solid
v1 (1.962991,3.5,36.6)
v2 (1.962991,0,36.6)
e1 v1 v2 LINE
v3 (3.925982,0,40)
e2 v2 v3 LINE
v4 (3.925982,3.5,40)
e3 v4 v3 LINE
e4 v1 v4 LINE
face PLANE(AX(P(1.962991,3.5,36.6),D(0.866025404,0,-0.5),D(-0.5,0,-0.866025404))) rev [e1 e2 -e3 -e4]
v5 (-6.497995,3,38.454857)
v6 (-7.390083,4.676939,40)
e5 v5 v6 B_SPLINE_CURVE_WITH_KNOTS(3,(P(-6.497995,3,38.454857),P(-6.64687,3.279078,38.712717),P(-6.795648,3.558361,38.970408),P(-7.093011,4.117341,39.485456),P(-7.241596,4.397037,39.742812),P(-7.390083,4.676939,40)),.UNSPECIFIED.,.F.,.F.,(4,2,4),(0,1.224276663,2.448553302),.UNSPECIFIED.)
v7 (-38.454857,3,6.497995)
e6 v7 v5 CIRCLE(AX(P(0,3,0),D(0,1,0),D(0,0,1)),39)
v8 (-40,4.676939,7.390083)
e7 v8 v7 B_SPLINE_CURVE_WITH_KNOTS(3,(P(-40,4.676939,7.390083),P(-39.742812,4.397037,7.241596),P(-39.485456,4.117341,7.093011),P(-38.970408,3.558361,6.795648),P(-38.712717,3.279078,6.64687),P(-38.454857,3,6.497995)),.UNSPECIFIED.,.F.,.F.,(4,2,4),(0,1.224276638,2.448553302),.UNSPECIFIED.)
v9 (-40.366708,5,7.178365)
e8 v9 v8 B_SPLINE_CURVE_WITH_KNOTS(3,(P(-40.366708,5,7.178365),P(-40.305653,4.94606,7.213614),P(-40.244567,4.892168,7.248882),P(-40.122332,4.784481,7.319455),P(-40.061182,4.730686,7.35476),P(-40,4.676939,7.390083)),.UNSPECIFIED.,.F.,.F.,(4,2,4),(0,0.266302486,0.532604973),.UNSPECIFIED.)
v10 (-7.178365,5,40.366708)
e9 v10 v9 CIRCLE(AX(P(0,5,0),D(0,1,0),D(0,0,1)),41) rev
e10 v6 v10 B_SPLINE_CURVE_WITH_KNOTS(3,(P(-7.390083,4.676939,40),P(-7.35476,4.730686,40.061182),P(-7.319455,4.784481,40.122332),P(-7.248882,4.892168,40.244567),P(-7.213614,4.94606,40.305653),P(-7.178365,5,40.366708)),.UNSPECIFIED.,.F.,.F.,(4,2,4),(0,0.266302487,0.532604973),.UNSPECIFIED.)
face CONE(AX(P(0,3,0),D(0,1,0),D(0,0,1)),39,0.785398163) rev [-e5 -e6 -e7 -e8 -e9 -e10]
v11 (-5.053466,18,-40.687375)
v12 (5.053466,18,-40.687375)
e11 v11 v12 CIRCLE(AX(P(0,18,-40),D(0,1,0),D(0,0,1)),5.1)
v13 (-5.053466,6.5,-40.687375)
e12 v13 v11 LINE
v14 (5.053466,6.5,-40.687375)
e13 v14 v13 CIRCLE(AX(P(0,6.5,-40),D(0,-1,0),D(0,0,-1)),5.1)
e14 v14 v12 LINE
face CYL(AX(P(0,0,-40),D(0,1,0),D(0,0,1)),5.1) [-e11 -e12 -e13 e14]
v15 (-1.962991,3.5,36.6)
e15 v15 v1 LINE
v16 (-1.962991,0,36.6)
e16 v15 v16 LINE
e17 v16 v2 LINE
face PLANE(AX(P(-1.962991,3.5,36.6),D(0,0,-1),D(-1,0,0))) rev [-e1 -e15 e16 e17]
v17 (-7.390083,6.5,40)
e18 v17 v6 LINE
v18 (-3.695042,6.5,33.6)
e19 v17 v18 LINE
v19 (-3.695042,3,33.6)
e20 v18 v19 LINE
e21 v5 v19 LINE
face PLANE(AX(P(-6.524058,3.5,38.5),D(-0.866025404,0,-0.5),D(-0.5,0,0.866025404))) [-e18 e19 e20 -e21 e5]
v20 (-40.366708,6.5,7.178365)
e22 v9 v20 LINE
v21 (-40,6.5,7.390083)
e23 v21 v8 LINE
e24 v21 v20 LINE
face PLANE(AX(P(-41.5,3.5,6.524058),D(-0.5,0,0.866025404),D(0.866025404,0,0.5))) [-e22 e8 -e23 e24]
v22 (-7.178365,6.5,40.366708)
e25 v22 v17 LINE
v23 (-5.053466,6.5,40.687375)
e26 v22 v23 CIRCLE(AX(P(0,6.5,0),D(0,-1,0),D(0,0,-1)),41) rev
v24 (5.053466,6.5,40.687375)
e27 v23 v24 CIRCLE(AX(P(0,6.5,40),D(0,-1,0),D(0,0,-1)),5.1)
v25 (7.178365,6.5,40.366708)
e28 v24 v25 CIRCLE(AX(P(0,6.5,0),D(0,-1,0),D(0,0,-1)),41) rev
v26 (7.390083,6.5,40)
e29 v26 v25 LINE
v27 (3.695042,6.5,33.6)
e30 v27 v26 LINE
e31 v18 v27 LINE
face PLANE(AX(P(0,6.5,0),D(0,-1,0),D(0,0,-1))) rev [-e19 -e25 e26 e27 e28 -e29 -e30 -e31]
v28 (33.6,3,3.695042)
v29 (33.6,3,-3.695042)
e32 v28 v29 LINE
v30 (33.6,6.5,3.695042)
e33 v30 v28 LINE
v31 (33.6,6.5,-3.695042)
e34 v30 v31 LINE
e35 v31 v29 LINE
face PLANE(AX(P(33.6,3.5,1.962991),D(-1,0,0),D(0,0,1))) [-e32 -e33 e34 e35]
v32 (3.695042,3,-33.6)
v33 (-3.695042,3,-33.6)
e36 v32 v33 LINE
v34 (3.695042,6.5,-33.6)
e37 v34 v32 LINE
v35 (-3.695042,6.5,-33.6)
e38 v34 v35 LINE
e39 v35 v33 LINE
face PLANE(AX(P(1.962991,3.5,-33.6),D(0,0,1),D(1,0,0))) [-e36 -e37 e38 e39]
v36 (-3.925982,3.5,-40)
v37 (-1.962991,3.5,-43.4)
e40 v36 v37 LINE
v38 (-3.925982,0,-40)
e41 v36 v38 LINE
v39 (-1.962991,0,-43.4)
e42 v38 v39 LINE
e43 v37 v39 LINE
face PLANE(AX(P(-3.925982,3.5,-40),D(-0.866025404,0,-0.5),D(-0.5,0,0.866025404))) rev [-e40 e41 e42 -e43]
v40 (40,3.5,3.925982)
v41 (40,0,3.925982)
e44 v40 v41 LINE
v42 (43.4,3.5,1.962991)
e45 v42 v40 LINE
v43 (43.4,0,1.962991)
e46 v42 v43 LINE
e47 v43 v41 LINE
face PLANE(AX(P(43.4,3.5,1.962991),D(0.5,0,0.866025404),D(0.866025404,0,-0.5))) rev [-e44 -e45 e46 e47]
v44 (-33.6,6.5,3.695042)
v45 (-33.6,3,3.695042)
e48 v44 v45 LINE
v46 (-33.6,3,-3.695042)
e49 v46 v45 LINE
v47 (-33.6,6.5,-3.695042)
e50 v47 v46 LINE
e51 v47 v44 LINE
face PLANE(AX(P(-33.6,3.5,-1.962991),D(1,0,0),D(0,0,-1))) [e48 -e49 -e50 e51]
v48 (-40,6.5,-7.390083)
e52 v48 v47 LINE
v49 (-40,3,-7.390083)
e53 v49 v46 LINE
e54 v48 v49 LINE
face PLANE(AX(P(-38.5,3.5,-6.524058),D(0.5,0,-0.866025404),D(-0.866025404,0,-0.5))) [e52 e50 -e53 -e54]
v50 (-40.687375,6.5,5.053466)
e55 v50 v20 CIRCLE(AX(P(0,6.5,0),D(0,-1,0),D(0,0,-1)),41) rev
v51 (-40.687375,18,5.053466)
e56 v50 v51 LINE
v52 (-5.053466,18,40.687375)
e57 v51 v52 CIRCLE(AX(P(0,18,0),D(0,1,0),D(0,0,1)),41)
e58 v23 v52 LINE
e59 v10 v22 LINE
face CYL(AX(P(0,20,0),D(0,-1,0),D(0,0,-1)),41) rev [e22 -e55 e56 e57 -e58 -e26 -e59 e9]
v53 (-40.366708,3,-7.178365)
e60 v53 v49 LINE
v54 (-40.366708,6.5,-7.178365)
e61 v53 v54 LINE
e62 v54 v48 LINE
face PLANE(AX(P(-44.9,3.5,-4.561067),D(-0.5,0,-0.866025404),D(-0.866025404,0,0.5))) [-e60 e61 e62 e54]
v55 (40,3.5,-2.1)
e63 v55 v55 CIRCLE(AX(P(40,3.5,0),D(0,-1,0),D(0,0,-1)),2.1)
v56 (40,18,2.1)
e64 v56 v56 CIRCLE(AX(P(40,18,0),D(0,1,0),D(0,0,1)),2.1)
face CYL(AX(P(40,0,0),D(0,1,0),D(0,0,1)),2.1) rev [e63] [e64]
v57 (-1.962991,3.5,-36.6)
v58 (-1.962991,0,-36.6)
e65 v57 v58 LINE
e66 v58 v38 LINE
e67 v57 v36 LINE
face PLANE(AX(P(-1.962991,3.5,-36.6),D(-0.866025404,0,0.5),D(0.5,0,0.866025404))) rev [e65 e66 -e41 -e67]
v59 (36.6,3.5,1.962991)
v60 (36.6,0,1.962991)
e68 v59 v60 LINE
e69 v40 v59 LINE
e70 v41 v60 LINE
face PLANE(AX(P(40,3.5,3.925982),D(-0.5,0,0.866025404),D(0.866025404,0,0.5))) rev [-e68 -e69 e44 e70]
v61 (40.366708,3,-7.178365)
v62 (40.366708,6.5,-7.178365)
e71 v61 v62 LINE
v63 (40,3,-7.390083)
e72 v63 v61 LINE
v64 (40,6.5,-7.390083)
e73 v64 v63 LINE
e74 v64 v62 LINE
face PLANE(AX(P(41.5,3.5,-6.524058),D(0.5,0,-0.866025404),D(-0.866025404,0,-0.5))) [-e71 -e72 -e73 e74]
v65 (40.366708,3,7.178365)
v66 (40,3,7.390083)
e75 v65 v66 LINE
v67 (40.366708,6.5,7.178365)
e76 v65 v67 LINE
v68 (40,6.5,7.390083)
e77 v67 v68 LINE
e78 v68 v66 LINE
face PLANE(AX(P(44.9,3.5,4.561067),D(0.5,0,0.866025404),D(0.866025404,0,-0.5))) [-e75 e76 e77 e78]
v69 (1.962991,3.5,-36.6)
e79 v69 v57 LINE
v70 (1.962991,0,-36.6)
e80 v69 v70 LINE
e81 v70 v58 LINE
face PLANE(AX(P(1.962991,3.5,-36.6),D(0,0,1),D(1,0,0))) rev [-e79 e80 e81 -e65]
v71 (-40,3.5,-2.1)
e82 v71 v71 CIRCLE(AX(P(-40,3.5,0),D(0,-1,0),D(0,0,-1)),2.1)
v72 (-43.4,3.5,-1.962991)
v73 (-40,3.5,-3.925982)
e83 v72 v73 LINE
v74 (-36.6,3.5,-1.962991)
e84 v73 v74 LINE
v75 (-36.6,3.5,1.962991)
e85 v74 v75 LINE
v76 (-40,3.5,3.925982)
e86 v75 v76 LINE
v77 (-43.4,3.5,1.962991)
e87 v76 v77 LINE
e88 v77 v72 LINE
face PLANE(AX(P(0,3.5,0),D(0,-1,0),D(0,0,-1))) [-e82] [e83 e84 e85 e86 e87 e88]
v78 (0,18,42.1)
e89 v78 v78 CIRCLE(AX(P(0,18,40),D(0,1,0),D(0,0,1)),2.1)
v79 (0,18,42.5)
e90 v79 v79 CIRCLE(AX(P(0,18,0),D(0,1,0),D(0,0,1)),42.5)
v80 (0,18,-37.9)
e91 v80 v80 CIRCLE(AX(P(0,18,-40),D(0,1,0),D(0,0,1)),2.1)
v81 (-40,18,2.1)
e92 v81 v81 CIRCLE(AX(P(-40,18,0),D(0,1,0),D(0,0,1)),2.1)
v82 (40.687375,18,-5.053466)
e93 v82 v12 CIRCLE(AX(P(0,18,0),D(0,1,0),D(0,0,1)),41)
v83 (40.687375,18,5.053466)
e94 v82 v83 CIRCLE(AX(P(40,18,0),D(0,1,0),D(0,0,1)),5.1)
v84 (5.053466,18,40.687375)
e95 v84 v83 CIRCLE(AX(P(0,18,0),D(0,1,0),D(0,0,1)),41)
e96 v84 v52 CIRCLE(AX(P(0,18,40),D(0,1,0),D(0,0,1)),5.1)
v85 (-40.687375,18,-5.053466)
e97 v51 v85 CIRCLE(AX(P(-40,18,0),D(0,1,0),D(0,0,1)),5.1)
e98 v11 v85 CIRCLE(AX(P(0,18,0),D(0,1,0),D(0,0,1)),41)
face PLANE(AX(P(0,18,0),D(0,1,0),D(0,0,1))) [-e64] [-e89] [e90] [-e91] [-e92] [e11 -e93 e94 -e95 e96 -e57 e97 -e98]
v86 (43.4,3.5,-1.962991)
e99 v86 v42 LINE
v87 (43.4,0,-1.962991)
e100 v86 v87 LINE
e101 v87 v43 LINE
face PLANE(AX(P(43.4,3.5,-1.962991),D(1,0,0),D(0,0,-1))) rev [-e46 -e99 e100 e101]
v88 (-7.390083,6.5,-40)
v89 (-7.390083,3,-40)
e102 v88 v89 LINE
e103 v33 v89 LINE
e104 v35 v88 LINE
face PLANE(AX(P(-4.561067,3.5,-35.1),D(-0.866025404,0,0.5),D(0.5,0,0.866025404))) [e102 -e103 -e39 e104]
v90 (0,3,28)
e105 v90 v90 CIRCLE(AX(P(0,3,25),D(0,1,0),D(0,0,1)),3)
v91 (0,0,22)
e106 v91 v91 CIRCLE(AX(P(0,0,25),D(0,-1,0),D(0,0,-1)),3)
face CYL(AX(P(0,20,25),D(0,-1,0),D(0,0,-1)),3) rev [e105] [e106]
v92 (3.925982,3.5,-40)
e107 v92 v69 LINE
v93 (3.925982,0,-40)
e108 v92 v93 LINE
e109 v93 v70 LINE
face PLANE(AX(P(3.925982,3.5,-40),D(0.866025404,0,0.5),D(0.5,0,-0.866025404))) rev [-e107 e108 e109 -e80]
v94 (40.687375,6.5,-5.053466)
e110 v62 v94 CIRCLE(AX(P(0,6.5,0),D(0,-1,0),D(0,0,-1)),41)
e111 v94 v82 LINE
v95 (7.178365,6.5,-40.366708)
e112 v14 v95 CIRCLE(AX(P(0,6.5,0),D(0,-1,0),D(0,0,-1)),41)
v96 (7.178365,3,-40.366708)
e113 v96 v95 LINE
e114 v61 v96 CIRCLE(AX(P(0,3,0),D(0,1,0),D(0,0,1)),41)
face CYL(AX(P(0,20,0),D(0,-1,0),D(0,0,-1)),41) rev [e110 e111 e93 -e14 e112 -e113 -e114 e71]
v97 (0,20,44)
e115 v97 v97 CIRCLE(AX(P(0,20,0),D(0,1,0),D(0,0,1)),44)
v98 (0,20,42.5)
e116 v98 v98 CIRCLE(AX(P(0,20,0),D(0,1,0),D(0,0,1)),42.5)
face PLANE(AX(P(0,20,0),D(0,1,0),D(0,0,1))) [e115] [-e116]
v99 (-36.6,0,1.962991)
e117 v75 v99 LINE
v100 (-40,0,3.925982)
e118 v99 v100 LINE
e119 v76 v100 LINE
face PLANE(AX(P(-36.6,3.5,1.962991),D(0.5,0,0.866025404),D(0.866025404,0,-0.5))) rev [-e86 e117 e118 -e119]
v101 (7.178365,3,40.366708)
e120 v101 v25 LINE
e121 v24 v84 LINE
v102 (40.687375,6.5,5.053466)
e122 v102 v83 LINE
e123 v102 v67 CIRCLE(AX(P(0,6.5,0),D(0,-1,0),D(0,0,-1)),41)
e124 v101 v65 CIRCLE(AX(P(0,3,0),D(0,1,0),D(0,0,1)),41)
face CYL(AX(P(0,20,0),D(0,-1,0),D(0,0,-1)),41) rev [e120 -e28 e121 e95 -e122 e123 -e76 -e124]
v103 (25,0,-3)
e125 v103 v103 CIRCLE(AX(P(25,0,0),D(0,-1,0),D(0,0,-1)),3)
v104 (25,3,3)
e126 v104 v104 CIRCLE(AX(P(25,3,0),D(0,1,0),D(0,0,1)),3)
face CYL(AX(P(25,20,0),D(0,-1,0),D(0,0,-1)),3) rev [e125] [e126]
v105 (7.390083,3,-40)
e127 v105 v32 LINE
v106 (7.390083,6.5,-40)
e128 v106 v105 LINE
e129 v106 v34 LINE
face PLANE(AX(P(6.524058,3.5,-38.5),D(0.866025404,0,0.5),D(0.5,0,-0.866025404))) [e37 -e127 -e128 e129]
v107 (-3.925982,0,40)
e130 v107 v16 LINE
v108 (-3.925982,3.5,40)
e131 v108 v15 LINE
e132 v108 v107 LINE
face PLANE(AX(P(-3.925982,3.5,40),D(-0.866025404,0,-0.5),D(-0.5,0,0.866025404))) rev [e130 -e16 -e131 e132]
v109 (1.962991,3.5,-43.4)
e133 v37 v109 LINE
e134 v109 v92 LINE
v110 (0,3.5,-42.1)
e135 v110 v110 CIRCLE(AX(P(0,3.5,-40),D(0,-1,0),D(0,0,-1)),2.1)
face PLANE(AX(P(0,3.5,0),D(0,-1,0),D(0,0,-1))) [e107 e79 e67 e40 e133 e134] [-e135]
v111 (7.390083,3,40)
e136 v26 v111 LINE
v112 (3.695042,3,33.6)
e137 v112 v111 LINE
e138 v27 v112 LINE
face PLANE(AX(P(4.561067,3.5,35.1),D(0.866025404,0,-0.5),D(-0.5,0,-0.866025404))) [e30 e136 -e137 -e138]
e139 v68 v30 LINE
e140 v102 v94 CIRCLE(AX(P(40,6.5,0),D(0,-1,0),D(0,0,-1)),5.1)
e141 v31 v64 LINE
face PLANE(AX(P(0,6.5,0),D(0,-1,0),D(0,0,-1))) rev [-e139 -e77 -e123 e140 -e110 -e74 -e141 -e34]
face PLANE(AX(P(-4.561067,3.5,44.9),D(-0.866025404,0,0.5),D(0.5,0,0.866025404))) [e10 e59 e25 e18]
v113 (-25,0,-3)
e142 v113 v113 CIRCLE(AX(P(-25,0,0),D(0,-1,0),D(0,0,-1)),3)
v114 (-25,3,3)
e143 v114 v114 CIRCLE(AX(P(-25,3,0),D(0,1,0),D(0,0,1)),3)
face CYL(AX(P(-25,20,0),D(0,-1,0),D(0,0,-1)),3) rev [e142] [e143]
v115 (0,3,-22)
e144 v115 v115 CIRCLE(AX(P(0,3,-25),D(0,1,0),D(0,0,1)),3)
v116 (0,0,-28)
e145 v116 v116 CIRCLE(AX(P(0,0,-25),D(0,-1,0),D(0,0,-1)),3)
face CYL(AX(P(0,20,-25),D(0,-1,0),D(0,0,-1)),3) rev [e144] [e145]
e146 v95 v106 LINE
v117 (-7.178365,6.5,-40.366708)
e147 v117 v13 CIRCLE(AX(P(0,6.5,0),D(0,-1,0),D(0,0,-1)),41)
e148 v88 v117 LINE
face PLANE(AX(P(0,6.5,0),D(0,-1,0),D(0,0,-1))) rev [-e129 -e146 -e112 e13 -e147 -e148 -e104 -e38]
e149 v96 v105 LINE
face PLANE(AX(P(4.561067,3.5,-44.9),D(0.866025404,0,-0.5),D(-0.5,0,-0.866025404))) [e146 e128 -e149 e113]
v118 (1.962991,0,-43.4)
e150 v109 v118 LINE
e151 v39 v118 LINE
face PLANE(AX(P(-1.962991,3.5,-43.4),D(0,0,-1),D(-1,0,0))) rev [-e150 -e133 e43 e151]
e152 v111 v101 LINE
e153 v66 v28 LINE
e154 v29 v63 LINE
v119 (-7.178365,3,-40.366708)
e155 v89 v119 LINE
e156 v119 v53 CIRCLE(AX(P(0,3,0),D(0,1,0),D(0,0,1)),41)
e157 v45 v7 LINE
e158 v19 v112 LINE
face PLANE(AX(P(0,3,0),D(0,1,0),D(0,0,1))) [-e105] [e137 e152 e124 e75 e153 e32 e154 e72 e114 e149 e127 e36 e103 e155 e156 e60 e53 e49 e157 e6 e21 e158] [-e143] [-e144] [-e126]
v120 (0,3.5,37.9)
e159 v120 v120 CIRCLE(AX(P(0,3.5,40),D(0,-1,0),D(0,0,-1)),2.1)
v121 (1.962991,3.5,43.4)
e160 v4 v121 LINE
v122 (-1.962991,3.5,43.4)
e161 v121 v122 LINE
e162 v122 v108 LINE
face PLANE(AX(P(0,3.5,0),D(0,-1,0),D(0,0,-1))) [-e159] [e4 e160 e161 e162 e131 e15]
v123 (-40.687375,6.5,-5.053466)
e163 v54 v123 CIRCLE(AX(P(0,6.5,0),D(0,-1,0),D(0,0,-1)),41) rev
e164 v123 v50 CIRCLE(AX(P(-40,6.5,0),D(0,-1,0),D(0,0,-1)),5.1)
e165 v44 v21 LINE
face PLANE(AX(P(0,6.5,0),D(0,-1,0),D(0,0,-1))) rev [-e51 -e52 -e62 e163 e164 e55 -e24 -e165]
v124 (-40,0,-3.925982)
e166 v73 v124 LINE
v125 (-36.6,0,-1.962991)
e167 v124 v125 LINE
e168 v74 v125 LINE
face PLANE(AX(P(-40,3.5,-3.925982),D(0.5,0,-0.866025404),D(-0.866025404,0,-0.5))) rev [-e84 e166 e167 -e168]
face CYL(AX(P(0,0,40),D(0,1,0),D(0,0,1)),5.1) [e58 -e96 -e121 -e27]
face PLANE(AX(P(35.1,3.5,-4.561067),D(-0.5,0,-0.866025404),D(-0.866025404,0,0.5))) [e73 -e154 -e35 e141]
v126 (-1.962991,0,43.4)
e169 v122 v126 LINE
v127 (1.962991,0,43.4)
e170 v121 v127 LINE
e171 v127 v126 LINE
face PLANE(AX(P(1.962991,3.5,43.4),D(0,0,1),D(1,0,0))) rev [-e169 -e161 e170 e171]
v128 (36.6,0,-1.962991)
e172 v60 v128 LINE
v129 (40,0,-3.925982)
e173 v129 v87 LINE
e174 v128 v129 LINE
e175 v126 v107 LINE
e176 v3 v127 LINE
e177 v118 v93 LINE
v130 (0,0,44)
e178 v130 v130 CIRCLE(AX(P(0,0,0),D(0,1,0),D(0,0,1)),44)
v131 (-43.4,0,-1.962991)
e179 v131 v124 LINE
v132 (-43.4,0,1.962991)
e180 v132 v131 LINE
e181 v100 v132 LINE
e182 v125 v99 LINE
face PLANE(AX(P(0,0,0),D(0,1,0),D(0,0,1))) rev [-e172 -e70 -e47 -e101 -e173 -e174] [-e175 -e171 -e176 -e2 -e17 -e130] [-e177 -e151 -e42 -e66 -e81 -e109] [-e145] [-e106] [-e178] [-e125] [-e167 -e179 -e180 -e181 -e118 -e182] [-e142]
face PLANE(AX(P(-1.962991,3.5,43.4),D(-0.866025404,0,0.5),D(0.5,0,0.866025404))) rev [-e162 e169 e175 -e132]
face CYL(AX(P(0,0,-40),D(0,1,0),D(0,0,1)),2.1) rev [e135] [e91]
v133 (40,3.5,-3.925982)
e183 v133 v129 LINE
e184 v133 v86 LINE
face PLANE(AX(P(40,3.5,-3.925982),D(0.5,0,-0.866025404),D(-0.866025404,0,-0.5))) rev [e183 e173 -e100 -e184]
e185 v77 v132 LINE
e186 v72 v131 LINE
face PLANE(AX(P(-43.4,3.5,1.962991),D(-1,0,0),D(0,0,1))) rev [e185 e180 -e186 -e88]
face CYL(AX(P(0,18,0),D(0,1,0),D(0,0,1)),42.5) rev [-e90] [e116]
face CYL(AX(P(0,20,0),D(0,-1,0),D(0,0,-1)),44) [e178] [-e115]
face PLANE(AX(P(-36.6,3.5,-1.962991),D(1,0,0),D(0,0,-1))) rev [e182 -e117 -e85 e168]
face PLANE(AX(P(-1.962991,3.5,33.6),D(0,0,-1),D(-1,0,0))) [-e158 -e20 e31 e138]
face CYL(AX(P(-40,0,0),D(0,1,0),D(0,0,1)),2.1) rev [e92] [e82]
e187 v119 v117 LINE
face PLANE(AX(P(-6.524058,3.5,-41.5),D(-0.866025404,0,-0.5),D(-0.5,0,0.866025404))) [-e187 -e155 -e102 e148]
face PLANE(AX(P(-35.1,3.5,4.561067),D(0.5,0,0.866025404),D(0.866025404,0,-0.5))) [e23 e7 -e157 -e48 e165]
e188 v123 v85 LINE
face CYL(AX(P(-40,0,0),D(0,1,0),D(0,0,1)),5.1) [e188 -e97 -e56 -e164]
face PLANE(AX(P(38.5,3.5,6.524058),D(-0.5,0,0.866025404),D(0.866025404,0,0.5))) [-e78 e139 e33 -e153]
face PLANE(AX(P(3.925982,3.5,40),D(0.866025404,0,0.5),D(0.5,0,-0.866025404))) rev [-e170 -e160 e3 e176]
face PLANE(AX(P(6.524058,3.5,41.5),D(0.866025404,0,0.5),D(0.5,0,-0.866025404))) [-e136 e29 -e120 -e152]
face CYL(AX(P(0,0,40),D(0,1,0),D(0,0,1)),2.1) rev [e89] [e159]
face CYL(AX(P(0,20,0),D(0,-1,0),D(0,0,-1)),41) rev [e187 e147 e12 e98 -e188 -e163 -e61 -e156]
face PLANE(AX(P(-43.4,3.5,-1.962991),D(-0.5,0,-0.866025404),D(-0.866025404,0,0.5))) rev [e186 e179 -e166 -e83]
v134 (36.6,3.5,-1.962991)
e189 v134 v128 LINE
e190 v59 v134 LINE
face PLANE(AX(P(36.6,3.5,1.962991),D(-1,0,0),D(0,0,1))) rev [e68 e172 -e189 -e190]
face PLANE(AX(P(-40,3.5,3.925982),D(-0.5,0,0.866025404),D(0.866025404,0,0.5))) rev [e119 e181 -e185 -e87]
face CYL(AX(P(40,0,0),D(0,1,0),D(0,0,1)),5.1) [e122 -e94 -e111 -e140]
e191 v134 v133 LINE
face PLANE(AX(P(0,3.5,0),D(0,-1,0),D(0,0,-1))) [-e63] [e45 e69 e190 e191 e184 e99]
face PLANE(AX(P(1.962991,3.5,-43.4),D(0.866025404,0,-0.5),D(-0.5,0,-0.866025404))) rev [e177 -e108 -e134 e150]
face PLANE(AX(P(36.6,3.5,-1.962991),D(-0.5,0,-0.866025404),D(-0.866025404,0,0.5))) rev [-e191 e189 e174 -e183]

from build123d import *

# Parameters (mm, degrees)
CROQUIS1_R              = 44
SALIENTE_EXTRUIR1_DEPTH = 20
CROQUIS3_R              = 2.1
CORTAR_EXTRUIR3_DEPTH   = 81.199750623
CORTAR_EXTRUIR5_DEPTH   = 3.5
VACIADO1_START          = 3
VACIADO1_DEPTH          = 17
VACIADO1_START_2        = 6.5
VACIADO1_2_DEPTH        = 13.5
CROQUIS2_R              = 3
CORTAR_EXTRUIR1_DEPTH   = 66.360538553
CROQUIS4_R              = 42.5
CORTAR_EXTRUIR4_DEPTH   = 2
CHAFL_N1_SIZE           = 2


# Read off the part's stored shape, not the designer's step: Vaciado1
with BuildPart() as part:
    # Croquis1 → Saliente-Extruir1 (new body)
    with BuildSketch(Plane(origin=(0, 0, 0), x_dir=(1, 0, 0), z_dir=(0, 1, 0))):
        with Locations(Location((0, 0, 0), (0, 0, 270))):
            Circle(CROQUIS1_R)
    extrude(amount=SALIENTE_EXTRUIR1_DEPTH)

    # Croquis3 → Cortar-Extruir3 (cut, through all)
    with BuildSketch(Plane(origin=(0, 20, -20), x_dir=(1, 0, 0), z_dir=(0, -1, 0))):
        with Locations(Location((-40, 20, 0), (0, 0, 270))):
            Circle(CROQUIS3_R)
        with Locations(Location((0, 60, 0), (0, 0, 270))):
            Circle(CROQUIS3_R)
        with Locations(Location((40, 20, 0), (0, 0, 270))):
            Circle(CROQUIS3_R)
        with Locations(Location((0, -20, 0), (0, 0, 270))):
            Circle(CROQUIS3_R)
    extrude(amount=CORTAR_EXTRUIR3_DEPTH, mode=Mode.SUBTRACT)

    # Croquis5 → Cortar-Extruir5 (cut)
    with BuildSketch(Plane.XZ):
        Polygon((40, -3.92598183), (43.4, -1.962990915), (43.4, 1.962990915), (40, 3.92598183), (36.6, 1.962990915), (36.6, -1.962990915), align=None)
        Polygon((3.92598183, 40), (1.962990915, 43.4), (-1.962990915, 43.4), (-3.92598183, 40), (-1.962990915, 36.6), (1.962990915, 36.6), align=None)
        Polygon((-3.92598183, -40), (-1.962990915, -43.4), (1.962990915, -43.4), (3.92598183, -40), (1.962990915, -36.6), (-1.962990915, -36.6), align=None)
        Polygon((-40, 3.92598183), (-43.4, 1.962990915), (-43.4, -1.962990915), (-40, -3.92598183), (-36.6, -1.962990915), (-36.6, 1.962990915), align=None)
    extrude(amount=-CORTAR_EXTRUIR5_DEPTH, mode=Mode.SUBTRACT)

    # Vaciado1 outline → Vaciado1 (cut)
    with BuildSketch(Plane(origin=(0, 0, 0), x_dir=(1, 0, 0), z_dir=(0, 1, 0)).offset(VACIADO1_START)):
        with BuildLine():
            ThreePointArc((-7.178364733, 40.366707567), (-28.991378029, 28.991378029), (-40.366707567, 7.178364733))
            Line((-40.366707567, 7.178364733), (-40, 7.390083446))
            Line((-40, 7.390083446), (-33.6, 3.695041723))
            Line((-33.6, 3.695041723), (-33.6, -3.695041723))
            Line((-33.6, -3.695041723), (-40, -7.390083446))
            Line((-40, -7.390083446), (-40.366707567, -7.178364733))
            ThreePointArc((-40.366707567, -7.178364733), (-28.991378029, -28.991378029), (-7.178364733, -40.366707567))
            Line((-7.178364733, -40.366707567), (-7.390083446, -40))
            Line((-7.390083446, -40), (-3.695041723, -33.6))
            Line((-3.695041723, -33.6), (3.695041723, -33.6))
            Line((3.695041723, -33.6), (7.390083446, -40))
            Line((7.390083446, -40), (7.178364733, -40.366707567))
            ThreePointArc((7.178364733, -40.366707567), (28.991378029, -28.991378029), (40.366707567, -7.178364733))
            Line((40.366707567, -7.178364733), (40, -7.390083446))
            Line((40, -7.390083446), (33.6, -3.695041723))
            Line((33.6, -3.695041723), (33.6, 3.695041723))
            Line((33.6, 3.695041723), (40, 7.390083446))
            Line((40, 7.390083446), (40.366707567, 7.178364733))
            ThreePointArc((40.366707567, 7.178364733), (28.991378029, 28.991378029), (7.178364733, 40.366707567))
            Line((7.178364733, 40.366707567), (7.390083446, 40))
            Line((7.390083446, 40), (3.695041723, 33.6))
            Line((3.695041723, 33.6), (-3.695041723, 33.6))
            Line((-3.695041723, 33.6), (-7.390083446, 40))
            Line((-7.390083446, 40), (-7.178364733, 40.366707567))
        make_face()
    extrude(amount=VACIADO1_DEPTH, mode=Mode.SUBTRACT)

    # Vaciado1 2 outline → Vaciado1 2 (cut)
    with BuildSketch(Plane(origin=(0, 0, 0), x_dir=(1, 0, 0), z_dir=(0, 1, 0)).offset(VACIADO1_START_2)):
        with BuildLine():
            ThreePointArc((-40.366707567, 7.178364733), (-40.540965383, 6.118016497), (-40.687375, 5.053465703))
            ThreePointArc((-40.687375, 5.053465703), (-34.9, 0), (-40.687375, -5.053465703))
            ThreePointArc((-40.687375, -5.053465703), (-40.540965383, -6.118016497), (-40.366707567, -7.178364733))
            Line((-40.366707567, -7.178364733), (-40, -7.390083446))
            Line((-40, -7.390083446), (-33.6, -3.695041723))
            Line((-33.6, -3.695041723), (-33.6, 3.695041723))
            Line((-33.6, 3.695041723), (-40, 7.390083446))
            Line((-40, 7.390083446), (-40.366707567, 7.178364733))
        make_face()
        with BuildLine():
            ThreePointArc((-5.053465703, 40.687375), (-6.118016497, 40.540965383), (-7.178364733, 40.366707567))
            Line((-7.178364733, 40.366707567), (-7.390083446, 40))
            Line((-7.390083446, 40), (-3.695041723, 33.6))
            Line((-3.695041723, 33.6), (3.695041723, 33.6))
            Line((3.695041723, 33.6), (7.390083446, 40))
            Line((7.390083446, 40), (7.178364733, 40.366707567))
            ThreePointArc((7.178364733, 40.366707567), (6.118016497, 40.540965383), (5.053465703, 40.687375))
            ThreePointArc((5.053465703, 40.687375), (0, 34.9), (-5.053465703, 40.687375))
        make_face()
        with BuildLine():
            Line((-7.390083446, -40), (-7.178364733, -40.366707567))
            ThreePointArc((-7.178364733, -40.366707567), (-6.118016497, -40.540965383), (-5.053465703, -40.687375))
            ThreePointArc((-5.053465703, -40.687375), (0, -34.9), (5.053465703, -40.687375))
            ThreePointArc((5.053465703, -40.687375), (6.118016497, -40.540965383), (7.178364733, -40.366707567))
            Line((7.178364733, -40.366707567), (7.390083446, -40))
            Line((7.390083446, -40), (3.695041723, -33.6))
            Line((3.695041723, -33.6), (-3.695041723, -33.6))
            Line((-3.695041723, -33.6), (-7.390083446, -40))
        make_face()
        with BuildLine():
            ThreePointArc((40.687375, 5.053465703), (40.540965383, 6.118016497), (40.366707567, 7.178364733))
            Line((40.366707567, 7.178364733), (40, 7.390083446))
            Line((40, 7.390083446), (33.6, 3.695041723))
            Line((33.6, 3.695041723), (33.6, -3.695041723))
            Line((33.6, -3.695041723), (40, -7.390083446))
            Line((40, -7.390083446), (40.366707567, -7.178364733))
            ThreePointArc((40.366707567, -7.178364733), (40.540965383, -6.118016497), (40.687375, -5.053465703))
            ThreePointArc((40.687375, -5.053465703), (34.9, 0), (40.687375, 5.053465703))
        make_face()
    extrude(amount=VACIADO1_2_DEPTH, mode=Mode.SUBTRACT)

    # Croquis2 → Cortar-Extruir1 (cut, through all)
    with BuildSketch(Plane.XZ):
        with Locations(Location((0, 25, 0), (0, 0, 270))):
            Circle(CROQUIS2_R)
        with Locations(Location((25, 0, 0), (0, 0, 270))):
            Circle(CROQUIS2_R)
        with Locations(Location((0, -25, 0), (0, 0, 270))):
            Circle(CROQUIS2_R)
        with Locations(Location((-25, 0, 0), (0, 0, 270))):
            Circle(CROQUIS2_R)
    extrude(amount=-CORTAR_EXTRUIR1_DEPTH, mode=Mode.SUBTRACT)

    # Croquis4 → Cortar-Extruir4 (cut)
    with BuildSketch(Plane(origin=(0, 20, 0), x_dir=(1, 0, 0), z_dir=(0, 1, 0))):
        with Locations(Location((0, 0, 0), (0, 0, 270))):
            Circle(CROQUIS4_R)
    extrude(amount=-CORTAR_EXTRUIR4_DEPTH, mode=Mode.SUBTRACT)

    # Chaflán1
    chafl_n1_edges = [part.edges().sort_by_distance(p)[0] for p in [
        (-28.991378029, 3, 28.991378029),
    ]]
    chamfer(chafl_n1_edges, length=CHAFL_N1_SIZE)


solid = part.part
